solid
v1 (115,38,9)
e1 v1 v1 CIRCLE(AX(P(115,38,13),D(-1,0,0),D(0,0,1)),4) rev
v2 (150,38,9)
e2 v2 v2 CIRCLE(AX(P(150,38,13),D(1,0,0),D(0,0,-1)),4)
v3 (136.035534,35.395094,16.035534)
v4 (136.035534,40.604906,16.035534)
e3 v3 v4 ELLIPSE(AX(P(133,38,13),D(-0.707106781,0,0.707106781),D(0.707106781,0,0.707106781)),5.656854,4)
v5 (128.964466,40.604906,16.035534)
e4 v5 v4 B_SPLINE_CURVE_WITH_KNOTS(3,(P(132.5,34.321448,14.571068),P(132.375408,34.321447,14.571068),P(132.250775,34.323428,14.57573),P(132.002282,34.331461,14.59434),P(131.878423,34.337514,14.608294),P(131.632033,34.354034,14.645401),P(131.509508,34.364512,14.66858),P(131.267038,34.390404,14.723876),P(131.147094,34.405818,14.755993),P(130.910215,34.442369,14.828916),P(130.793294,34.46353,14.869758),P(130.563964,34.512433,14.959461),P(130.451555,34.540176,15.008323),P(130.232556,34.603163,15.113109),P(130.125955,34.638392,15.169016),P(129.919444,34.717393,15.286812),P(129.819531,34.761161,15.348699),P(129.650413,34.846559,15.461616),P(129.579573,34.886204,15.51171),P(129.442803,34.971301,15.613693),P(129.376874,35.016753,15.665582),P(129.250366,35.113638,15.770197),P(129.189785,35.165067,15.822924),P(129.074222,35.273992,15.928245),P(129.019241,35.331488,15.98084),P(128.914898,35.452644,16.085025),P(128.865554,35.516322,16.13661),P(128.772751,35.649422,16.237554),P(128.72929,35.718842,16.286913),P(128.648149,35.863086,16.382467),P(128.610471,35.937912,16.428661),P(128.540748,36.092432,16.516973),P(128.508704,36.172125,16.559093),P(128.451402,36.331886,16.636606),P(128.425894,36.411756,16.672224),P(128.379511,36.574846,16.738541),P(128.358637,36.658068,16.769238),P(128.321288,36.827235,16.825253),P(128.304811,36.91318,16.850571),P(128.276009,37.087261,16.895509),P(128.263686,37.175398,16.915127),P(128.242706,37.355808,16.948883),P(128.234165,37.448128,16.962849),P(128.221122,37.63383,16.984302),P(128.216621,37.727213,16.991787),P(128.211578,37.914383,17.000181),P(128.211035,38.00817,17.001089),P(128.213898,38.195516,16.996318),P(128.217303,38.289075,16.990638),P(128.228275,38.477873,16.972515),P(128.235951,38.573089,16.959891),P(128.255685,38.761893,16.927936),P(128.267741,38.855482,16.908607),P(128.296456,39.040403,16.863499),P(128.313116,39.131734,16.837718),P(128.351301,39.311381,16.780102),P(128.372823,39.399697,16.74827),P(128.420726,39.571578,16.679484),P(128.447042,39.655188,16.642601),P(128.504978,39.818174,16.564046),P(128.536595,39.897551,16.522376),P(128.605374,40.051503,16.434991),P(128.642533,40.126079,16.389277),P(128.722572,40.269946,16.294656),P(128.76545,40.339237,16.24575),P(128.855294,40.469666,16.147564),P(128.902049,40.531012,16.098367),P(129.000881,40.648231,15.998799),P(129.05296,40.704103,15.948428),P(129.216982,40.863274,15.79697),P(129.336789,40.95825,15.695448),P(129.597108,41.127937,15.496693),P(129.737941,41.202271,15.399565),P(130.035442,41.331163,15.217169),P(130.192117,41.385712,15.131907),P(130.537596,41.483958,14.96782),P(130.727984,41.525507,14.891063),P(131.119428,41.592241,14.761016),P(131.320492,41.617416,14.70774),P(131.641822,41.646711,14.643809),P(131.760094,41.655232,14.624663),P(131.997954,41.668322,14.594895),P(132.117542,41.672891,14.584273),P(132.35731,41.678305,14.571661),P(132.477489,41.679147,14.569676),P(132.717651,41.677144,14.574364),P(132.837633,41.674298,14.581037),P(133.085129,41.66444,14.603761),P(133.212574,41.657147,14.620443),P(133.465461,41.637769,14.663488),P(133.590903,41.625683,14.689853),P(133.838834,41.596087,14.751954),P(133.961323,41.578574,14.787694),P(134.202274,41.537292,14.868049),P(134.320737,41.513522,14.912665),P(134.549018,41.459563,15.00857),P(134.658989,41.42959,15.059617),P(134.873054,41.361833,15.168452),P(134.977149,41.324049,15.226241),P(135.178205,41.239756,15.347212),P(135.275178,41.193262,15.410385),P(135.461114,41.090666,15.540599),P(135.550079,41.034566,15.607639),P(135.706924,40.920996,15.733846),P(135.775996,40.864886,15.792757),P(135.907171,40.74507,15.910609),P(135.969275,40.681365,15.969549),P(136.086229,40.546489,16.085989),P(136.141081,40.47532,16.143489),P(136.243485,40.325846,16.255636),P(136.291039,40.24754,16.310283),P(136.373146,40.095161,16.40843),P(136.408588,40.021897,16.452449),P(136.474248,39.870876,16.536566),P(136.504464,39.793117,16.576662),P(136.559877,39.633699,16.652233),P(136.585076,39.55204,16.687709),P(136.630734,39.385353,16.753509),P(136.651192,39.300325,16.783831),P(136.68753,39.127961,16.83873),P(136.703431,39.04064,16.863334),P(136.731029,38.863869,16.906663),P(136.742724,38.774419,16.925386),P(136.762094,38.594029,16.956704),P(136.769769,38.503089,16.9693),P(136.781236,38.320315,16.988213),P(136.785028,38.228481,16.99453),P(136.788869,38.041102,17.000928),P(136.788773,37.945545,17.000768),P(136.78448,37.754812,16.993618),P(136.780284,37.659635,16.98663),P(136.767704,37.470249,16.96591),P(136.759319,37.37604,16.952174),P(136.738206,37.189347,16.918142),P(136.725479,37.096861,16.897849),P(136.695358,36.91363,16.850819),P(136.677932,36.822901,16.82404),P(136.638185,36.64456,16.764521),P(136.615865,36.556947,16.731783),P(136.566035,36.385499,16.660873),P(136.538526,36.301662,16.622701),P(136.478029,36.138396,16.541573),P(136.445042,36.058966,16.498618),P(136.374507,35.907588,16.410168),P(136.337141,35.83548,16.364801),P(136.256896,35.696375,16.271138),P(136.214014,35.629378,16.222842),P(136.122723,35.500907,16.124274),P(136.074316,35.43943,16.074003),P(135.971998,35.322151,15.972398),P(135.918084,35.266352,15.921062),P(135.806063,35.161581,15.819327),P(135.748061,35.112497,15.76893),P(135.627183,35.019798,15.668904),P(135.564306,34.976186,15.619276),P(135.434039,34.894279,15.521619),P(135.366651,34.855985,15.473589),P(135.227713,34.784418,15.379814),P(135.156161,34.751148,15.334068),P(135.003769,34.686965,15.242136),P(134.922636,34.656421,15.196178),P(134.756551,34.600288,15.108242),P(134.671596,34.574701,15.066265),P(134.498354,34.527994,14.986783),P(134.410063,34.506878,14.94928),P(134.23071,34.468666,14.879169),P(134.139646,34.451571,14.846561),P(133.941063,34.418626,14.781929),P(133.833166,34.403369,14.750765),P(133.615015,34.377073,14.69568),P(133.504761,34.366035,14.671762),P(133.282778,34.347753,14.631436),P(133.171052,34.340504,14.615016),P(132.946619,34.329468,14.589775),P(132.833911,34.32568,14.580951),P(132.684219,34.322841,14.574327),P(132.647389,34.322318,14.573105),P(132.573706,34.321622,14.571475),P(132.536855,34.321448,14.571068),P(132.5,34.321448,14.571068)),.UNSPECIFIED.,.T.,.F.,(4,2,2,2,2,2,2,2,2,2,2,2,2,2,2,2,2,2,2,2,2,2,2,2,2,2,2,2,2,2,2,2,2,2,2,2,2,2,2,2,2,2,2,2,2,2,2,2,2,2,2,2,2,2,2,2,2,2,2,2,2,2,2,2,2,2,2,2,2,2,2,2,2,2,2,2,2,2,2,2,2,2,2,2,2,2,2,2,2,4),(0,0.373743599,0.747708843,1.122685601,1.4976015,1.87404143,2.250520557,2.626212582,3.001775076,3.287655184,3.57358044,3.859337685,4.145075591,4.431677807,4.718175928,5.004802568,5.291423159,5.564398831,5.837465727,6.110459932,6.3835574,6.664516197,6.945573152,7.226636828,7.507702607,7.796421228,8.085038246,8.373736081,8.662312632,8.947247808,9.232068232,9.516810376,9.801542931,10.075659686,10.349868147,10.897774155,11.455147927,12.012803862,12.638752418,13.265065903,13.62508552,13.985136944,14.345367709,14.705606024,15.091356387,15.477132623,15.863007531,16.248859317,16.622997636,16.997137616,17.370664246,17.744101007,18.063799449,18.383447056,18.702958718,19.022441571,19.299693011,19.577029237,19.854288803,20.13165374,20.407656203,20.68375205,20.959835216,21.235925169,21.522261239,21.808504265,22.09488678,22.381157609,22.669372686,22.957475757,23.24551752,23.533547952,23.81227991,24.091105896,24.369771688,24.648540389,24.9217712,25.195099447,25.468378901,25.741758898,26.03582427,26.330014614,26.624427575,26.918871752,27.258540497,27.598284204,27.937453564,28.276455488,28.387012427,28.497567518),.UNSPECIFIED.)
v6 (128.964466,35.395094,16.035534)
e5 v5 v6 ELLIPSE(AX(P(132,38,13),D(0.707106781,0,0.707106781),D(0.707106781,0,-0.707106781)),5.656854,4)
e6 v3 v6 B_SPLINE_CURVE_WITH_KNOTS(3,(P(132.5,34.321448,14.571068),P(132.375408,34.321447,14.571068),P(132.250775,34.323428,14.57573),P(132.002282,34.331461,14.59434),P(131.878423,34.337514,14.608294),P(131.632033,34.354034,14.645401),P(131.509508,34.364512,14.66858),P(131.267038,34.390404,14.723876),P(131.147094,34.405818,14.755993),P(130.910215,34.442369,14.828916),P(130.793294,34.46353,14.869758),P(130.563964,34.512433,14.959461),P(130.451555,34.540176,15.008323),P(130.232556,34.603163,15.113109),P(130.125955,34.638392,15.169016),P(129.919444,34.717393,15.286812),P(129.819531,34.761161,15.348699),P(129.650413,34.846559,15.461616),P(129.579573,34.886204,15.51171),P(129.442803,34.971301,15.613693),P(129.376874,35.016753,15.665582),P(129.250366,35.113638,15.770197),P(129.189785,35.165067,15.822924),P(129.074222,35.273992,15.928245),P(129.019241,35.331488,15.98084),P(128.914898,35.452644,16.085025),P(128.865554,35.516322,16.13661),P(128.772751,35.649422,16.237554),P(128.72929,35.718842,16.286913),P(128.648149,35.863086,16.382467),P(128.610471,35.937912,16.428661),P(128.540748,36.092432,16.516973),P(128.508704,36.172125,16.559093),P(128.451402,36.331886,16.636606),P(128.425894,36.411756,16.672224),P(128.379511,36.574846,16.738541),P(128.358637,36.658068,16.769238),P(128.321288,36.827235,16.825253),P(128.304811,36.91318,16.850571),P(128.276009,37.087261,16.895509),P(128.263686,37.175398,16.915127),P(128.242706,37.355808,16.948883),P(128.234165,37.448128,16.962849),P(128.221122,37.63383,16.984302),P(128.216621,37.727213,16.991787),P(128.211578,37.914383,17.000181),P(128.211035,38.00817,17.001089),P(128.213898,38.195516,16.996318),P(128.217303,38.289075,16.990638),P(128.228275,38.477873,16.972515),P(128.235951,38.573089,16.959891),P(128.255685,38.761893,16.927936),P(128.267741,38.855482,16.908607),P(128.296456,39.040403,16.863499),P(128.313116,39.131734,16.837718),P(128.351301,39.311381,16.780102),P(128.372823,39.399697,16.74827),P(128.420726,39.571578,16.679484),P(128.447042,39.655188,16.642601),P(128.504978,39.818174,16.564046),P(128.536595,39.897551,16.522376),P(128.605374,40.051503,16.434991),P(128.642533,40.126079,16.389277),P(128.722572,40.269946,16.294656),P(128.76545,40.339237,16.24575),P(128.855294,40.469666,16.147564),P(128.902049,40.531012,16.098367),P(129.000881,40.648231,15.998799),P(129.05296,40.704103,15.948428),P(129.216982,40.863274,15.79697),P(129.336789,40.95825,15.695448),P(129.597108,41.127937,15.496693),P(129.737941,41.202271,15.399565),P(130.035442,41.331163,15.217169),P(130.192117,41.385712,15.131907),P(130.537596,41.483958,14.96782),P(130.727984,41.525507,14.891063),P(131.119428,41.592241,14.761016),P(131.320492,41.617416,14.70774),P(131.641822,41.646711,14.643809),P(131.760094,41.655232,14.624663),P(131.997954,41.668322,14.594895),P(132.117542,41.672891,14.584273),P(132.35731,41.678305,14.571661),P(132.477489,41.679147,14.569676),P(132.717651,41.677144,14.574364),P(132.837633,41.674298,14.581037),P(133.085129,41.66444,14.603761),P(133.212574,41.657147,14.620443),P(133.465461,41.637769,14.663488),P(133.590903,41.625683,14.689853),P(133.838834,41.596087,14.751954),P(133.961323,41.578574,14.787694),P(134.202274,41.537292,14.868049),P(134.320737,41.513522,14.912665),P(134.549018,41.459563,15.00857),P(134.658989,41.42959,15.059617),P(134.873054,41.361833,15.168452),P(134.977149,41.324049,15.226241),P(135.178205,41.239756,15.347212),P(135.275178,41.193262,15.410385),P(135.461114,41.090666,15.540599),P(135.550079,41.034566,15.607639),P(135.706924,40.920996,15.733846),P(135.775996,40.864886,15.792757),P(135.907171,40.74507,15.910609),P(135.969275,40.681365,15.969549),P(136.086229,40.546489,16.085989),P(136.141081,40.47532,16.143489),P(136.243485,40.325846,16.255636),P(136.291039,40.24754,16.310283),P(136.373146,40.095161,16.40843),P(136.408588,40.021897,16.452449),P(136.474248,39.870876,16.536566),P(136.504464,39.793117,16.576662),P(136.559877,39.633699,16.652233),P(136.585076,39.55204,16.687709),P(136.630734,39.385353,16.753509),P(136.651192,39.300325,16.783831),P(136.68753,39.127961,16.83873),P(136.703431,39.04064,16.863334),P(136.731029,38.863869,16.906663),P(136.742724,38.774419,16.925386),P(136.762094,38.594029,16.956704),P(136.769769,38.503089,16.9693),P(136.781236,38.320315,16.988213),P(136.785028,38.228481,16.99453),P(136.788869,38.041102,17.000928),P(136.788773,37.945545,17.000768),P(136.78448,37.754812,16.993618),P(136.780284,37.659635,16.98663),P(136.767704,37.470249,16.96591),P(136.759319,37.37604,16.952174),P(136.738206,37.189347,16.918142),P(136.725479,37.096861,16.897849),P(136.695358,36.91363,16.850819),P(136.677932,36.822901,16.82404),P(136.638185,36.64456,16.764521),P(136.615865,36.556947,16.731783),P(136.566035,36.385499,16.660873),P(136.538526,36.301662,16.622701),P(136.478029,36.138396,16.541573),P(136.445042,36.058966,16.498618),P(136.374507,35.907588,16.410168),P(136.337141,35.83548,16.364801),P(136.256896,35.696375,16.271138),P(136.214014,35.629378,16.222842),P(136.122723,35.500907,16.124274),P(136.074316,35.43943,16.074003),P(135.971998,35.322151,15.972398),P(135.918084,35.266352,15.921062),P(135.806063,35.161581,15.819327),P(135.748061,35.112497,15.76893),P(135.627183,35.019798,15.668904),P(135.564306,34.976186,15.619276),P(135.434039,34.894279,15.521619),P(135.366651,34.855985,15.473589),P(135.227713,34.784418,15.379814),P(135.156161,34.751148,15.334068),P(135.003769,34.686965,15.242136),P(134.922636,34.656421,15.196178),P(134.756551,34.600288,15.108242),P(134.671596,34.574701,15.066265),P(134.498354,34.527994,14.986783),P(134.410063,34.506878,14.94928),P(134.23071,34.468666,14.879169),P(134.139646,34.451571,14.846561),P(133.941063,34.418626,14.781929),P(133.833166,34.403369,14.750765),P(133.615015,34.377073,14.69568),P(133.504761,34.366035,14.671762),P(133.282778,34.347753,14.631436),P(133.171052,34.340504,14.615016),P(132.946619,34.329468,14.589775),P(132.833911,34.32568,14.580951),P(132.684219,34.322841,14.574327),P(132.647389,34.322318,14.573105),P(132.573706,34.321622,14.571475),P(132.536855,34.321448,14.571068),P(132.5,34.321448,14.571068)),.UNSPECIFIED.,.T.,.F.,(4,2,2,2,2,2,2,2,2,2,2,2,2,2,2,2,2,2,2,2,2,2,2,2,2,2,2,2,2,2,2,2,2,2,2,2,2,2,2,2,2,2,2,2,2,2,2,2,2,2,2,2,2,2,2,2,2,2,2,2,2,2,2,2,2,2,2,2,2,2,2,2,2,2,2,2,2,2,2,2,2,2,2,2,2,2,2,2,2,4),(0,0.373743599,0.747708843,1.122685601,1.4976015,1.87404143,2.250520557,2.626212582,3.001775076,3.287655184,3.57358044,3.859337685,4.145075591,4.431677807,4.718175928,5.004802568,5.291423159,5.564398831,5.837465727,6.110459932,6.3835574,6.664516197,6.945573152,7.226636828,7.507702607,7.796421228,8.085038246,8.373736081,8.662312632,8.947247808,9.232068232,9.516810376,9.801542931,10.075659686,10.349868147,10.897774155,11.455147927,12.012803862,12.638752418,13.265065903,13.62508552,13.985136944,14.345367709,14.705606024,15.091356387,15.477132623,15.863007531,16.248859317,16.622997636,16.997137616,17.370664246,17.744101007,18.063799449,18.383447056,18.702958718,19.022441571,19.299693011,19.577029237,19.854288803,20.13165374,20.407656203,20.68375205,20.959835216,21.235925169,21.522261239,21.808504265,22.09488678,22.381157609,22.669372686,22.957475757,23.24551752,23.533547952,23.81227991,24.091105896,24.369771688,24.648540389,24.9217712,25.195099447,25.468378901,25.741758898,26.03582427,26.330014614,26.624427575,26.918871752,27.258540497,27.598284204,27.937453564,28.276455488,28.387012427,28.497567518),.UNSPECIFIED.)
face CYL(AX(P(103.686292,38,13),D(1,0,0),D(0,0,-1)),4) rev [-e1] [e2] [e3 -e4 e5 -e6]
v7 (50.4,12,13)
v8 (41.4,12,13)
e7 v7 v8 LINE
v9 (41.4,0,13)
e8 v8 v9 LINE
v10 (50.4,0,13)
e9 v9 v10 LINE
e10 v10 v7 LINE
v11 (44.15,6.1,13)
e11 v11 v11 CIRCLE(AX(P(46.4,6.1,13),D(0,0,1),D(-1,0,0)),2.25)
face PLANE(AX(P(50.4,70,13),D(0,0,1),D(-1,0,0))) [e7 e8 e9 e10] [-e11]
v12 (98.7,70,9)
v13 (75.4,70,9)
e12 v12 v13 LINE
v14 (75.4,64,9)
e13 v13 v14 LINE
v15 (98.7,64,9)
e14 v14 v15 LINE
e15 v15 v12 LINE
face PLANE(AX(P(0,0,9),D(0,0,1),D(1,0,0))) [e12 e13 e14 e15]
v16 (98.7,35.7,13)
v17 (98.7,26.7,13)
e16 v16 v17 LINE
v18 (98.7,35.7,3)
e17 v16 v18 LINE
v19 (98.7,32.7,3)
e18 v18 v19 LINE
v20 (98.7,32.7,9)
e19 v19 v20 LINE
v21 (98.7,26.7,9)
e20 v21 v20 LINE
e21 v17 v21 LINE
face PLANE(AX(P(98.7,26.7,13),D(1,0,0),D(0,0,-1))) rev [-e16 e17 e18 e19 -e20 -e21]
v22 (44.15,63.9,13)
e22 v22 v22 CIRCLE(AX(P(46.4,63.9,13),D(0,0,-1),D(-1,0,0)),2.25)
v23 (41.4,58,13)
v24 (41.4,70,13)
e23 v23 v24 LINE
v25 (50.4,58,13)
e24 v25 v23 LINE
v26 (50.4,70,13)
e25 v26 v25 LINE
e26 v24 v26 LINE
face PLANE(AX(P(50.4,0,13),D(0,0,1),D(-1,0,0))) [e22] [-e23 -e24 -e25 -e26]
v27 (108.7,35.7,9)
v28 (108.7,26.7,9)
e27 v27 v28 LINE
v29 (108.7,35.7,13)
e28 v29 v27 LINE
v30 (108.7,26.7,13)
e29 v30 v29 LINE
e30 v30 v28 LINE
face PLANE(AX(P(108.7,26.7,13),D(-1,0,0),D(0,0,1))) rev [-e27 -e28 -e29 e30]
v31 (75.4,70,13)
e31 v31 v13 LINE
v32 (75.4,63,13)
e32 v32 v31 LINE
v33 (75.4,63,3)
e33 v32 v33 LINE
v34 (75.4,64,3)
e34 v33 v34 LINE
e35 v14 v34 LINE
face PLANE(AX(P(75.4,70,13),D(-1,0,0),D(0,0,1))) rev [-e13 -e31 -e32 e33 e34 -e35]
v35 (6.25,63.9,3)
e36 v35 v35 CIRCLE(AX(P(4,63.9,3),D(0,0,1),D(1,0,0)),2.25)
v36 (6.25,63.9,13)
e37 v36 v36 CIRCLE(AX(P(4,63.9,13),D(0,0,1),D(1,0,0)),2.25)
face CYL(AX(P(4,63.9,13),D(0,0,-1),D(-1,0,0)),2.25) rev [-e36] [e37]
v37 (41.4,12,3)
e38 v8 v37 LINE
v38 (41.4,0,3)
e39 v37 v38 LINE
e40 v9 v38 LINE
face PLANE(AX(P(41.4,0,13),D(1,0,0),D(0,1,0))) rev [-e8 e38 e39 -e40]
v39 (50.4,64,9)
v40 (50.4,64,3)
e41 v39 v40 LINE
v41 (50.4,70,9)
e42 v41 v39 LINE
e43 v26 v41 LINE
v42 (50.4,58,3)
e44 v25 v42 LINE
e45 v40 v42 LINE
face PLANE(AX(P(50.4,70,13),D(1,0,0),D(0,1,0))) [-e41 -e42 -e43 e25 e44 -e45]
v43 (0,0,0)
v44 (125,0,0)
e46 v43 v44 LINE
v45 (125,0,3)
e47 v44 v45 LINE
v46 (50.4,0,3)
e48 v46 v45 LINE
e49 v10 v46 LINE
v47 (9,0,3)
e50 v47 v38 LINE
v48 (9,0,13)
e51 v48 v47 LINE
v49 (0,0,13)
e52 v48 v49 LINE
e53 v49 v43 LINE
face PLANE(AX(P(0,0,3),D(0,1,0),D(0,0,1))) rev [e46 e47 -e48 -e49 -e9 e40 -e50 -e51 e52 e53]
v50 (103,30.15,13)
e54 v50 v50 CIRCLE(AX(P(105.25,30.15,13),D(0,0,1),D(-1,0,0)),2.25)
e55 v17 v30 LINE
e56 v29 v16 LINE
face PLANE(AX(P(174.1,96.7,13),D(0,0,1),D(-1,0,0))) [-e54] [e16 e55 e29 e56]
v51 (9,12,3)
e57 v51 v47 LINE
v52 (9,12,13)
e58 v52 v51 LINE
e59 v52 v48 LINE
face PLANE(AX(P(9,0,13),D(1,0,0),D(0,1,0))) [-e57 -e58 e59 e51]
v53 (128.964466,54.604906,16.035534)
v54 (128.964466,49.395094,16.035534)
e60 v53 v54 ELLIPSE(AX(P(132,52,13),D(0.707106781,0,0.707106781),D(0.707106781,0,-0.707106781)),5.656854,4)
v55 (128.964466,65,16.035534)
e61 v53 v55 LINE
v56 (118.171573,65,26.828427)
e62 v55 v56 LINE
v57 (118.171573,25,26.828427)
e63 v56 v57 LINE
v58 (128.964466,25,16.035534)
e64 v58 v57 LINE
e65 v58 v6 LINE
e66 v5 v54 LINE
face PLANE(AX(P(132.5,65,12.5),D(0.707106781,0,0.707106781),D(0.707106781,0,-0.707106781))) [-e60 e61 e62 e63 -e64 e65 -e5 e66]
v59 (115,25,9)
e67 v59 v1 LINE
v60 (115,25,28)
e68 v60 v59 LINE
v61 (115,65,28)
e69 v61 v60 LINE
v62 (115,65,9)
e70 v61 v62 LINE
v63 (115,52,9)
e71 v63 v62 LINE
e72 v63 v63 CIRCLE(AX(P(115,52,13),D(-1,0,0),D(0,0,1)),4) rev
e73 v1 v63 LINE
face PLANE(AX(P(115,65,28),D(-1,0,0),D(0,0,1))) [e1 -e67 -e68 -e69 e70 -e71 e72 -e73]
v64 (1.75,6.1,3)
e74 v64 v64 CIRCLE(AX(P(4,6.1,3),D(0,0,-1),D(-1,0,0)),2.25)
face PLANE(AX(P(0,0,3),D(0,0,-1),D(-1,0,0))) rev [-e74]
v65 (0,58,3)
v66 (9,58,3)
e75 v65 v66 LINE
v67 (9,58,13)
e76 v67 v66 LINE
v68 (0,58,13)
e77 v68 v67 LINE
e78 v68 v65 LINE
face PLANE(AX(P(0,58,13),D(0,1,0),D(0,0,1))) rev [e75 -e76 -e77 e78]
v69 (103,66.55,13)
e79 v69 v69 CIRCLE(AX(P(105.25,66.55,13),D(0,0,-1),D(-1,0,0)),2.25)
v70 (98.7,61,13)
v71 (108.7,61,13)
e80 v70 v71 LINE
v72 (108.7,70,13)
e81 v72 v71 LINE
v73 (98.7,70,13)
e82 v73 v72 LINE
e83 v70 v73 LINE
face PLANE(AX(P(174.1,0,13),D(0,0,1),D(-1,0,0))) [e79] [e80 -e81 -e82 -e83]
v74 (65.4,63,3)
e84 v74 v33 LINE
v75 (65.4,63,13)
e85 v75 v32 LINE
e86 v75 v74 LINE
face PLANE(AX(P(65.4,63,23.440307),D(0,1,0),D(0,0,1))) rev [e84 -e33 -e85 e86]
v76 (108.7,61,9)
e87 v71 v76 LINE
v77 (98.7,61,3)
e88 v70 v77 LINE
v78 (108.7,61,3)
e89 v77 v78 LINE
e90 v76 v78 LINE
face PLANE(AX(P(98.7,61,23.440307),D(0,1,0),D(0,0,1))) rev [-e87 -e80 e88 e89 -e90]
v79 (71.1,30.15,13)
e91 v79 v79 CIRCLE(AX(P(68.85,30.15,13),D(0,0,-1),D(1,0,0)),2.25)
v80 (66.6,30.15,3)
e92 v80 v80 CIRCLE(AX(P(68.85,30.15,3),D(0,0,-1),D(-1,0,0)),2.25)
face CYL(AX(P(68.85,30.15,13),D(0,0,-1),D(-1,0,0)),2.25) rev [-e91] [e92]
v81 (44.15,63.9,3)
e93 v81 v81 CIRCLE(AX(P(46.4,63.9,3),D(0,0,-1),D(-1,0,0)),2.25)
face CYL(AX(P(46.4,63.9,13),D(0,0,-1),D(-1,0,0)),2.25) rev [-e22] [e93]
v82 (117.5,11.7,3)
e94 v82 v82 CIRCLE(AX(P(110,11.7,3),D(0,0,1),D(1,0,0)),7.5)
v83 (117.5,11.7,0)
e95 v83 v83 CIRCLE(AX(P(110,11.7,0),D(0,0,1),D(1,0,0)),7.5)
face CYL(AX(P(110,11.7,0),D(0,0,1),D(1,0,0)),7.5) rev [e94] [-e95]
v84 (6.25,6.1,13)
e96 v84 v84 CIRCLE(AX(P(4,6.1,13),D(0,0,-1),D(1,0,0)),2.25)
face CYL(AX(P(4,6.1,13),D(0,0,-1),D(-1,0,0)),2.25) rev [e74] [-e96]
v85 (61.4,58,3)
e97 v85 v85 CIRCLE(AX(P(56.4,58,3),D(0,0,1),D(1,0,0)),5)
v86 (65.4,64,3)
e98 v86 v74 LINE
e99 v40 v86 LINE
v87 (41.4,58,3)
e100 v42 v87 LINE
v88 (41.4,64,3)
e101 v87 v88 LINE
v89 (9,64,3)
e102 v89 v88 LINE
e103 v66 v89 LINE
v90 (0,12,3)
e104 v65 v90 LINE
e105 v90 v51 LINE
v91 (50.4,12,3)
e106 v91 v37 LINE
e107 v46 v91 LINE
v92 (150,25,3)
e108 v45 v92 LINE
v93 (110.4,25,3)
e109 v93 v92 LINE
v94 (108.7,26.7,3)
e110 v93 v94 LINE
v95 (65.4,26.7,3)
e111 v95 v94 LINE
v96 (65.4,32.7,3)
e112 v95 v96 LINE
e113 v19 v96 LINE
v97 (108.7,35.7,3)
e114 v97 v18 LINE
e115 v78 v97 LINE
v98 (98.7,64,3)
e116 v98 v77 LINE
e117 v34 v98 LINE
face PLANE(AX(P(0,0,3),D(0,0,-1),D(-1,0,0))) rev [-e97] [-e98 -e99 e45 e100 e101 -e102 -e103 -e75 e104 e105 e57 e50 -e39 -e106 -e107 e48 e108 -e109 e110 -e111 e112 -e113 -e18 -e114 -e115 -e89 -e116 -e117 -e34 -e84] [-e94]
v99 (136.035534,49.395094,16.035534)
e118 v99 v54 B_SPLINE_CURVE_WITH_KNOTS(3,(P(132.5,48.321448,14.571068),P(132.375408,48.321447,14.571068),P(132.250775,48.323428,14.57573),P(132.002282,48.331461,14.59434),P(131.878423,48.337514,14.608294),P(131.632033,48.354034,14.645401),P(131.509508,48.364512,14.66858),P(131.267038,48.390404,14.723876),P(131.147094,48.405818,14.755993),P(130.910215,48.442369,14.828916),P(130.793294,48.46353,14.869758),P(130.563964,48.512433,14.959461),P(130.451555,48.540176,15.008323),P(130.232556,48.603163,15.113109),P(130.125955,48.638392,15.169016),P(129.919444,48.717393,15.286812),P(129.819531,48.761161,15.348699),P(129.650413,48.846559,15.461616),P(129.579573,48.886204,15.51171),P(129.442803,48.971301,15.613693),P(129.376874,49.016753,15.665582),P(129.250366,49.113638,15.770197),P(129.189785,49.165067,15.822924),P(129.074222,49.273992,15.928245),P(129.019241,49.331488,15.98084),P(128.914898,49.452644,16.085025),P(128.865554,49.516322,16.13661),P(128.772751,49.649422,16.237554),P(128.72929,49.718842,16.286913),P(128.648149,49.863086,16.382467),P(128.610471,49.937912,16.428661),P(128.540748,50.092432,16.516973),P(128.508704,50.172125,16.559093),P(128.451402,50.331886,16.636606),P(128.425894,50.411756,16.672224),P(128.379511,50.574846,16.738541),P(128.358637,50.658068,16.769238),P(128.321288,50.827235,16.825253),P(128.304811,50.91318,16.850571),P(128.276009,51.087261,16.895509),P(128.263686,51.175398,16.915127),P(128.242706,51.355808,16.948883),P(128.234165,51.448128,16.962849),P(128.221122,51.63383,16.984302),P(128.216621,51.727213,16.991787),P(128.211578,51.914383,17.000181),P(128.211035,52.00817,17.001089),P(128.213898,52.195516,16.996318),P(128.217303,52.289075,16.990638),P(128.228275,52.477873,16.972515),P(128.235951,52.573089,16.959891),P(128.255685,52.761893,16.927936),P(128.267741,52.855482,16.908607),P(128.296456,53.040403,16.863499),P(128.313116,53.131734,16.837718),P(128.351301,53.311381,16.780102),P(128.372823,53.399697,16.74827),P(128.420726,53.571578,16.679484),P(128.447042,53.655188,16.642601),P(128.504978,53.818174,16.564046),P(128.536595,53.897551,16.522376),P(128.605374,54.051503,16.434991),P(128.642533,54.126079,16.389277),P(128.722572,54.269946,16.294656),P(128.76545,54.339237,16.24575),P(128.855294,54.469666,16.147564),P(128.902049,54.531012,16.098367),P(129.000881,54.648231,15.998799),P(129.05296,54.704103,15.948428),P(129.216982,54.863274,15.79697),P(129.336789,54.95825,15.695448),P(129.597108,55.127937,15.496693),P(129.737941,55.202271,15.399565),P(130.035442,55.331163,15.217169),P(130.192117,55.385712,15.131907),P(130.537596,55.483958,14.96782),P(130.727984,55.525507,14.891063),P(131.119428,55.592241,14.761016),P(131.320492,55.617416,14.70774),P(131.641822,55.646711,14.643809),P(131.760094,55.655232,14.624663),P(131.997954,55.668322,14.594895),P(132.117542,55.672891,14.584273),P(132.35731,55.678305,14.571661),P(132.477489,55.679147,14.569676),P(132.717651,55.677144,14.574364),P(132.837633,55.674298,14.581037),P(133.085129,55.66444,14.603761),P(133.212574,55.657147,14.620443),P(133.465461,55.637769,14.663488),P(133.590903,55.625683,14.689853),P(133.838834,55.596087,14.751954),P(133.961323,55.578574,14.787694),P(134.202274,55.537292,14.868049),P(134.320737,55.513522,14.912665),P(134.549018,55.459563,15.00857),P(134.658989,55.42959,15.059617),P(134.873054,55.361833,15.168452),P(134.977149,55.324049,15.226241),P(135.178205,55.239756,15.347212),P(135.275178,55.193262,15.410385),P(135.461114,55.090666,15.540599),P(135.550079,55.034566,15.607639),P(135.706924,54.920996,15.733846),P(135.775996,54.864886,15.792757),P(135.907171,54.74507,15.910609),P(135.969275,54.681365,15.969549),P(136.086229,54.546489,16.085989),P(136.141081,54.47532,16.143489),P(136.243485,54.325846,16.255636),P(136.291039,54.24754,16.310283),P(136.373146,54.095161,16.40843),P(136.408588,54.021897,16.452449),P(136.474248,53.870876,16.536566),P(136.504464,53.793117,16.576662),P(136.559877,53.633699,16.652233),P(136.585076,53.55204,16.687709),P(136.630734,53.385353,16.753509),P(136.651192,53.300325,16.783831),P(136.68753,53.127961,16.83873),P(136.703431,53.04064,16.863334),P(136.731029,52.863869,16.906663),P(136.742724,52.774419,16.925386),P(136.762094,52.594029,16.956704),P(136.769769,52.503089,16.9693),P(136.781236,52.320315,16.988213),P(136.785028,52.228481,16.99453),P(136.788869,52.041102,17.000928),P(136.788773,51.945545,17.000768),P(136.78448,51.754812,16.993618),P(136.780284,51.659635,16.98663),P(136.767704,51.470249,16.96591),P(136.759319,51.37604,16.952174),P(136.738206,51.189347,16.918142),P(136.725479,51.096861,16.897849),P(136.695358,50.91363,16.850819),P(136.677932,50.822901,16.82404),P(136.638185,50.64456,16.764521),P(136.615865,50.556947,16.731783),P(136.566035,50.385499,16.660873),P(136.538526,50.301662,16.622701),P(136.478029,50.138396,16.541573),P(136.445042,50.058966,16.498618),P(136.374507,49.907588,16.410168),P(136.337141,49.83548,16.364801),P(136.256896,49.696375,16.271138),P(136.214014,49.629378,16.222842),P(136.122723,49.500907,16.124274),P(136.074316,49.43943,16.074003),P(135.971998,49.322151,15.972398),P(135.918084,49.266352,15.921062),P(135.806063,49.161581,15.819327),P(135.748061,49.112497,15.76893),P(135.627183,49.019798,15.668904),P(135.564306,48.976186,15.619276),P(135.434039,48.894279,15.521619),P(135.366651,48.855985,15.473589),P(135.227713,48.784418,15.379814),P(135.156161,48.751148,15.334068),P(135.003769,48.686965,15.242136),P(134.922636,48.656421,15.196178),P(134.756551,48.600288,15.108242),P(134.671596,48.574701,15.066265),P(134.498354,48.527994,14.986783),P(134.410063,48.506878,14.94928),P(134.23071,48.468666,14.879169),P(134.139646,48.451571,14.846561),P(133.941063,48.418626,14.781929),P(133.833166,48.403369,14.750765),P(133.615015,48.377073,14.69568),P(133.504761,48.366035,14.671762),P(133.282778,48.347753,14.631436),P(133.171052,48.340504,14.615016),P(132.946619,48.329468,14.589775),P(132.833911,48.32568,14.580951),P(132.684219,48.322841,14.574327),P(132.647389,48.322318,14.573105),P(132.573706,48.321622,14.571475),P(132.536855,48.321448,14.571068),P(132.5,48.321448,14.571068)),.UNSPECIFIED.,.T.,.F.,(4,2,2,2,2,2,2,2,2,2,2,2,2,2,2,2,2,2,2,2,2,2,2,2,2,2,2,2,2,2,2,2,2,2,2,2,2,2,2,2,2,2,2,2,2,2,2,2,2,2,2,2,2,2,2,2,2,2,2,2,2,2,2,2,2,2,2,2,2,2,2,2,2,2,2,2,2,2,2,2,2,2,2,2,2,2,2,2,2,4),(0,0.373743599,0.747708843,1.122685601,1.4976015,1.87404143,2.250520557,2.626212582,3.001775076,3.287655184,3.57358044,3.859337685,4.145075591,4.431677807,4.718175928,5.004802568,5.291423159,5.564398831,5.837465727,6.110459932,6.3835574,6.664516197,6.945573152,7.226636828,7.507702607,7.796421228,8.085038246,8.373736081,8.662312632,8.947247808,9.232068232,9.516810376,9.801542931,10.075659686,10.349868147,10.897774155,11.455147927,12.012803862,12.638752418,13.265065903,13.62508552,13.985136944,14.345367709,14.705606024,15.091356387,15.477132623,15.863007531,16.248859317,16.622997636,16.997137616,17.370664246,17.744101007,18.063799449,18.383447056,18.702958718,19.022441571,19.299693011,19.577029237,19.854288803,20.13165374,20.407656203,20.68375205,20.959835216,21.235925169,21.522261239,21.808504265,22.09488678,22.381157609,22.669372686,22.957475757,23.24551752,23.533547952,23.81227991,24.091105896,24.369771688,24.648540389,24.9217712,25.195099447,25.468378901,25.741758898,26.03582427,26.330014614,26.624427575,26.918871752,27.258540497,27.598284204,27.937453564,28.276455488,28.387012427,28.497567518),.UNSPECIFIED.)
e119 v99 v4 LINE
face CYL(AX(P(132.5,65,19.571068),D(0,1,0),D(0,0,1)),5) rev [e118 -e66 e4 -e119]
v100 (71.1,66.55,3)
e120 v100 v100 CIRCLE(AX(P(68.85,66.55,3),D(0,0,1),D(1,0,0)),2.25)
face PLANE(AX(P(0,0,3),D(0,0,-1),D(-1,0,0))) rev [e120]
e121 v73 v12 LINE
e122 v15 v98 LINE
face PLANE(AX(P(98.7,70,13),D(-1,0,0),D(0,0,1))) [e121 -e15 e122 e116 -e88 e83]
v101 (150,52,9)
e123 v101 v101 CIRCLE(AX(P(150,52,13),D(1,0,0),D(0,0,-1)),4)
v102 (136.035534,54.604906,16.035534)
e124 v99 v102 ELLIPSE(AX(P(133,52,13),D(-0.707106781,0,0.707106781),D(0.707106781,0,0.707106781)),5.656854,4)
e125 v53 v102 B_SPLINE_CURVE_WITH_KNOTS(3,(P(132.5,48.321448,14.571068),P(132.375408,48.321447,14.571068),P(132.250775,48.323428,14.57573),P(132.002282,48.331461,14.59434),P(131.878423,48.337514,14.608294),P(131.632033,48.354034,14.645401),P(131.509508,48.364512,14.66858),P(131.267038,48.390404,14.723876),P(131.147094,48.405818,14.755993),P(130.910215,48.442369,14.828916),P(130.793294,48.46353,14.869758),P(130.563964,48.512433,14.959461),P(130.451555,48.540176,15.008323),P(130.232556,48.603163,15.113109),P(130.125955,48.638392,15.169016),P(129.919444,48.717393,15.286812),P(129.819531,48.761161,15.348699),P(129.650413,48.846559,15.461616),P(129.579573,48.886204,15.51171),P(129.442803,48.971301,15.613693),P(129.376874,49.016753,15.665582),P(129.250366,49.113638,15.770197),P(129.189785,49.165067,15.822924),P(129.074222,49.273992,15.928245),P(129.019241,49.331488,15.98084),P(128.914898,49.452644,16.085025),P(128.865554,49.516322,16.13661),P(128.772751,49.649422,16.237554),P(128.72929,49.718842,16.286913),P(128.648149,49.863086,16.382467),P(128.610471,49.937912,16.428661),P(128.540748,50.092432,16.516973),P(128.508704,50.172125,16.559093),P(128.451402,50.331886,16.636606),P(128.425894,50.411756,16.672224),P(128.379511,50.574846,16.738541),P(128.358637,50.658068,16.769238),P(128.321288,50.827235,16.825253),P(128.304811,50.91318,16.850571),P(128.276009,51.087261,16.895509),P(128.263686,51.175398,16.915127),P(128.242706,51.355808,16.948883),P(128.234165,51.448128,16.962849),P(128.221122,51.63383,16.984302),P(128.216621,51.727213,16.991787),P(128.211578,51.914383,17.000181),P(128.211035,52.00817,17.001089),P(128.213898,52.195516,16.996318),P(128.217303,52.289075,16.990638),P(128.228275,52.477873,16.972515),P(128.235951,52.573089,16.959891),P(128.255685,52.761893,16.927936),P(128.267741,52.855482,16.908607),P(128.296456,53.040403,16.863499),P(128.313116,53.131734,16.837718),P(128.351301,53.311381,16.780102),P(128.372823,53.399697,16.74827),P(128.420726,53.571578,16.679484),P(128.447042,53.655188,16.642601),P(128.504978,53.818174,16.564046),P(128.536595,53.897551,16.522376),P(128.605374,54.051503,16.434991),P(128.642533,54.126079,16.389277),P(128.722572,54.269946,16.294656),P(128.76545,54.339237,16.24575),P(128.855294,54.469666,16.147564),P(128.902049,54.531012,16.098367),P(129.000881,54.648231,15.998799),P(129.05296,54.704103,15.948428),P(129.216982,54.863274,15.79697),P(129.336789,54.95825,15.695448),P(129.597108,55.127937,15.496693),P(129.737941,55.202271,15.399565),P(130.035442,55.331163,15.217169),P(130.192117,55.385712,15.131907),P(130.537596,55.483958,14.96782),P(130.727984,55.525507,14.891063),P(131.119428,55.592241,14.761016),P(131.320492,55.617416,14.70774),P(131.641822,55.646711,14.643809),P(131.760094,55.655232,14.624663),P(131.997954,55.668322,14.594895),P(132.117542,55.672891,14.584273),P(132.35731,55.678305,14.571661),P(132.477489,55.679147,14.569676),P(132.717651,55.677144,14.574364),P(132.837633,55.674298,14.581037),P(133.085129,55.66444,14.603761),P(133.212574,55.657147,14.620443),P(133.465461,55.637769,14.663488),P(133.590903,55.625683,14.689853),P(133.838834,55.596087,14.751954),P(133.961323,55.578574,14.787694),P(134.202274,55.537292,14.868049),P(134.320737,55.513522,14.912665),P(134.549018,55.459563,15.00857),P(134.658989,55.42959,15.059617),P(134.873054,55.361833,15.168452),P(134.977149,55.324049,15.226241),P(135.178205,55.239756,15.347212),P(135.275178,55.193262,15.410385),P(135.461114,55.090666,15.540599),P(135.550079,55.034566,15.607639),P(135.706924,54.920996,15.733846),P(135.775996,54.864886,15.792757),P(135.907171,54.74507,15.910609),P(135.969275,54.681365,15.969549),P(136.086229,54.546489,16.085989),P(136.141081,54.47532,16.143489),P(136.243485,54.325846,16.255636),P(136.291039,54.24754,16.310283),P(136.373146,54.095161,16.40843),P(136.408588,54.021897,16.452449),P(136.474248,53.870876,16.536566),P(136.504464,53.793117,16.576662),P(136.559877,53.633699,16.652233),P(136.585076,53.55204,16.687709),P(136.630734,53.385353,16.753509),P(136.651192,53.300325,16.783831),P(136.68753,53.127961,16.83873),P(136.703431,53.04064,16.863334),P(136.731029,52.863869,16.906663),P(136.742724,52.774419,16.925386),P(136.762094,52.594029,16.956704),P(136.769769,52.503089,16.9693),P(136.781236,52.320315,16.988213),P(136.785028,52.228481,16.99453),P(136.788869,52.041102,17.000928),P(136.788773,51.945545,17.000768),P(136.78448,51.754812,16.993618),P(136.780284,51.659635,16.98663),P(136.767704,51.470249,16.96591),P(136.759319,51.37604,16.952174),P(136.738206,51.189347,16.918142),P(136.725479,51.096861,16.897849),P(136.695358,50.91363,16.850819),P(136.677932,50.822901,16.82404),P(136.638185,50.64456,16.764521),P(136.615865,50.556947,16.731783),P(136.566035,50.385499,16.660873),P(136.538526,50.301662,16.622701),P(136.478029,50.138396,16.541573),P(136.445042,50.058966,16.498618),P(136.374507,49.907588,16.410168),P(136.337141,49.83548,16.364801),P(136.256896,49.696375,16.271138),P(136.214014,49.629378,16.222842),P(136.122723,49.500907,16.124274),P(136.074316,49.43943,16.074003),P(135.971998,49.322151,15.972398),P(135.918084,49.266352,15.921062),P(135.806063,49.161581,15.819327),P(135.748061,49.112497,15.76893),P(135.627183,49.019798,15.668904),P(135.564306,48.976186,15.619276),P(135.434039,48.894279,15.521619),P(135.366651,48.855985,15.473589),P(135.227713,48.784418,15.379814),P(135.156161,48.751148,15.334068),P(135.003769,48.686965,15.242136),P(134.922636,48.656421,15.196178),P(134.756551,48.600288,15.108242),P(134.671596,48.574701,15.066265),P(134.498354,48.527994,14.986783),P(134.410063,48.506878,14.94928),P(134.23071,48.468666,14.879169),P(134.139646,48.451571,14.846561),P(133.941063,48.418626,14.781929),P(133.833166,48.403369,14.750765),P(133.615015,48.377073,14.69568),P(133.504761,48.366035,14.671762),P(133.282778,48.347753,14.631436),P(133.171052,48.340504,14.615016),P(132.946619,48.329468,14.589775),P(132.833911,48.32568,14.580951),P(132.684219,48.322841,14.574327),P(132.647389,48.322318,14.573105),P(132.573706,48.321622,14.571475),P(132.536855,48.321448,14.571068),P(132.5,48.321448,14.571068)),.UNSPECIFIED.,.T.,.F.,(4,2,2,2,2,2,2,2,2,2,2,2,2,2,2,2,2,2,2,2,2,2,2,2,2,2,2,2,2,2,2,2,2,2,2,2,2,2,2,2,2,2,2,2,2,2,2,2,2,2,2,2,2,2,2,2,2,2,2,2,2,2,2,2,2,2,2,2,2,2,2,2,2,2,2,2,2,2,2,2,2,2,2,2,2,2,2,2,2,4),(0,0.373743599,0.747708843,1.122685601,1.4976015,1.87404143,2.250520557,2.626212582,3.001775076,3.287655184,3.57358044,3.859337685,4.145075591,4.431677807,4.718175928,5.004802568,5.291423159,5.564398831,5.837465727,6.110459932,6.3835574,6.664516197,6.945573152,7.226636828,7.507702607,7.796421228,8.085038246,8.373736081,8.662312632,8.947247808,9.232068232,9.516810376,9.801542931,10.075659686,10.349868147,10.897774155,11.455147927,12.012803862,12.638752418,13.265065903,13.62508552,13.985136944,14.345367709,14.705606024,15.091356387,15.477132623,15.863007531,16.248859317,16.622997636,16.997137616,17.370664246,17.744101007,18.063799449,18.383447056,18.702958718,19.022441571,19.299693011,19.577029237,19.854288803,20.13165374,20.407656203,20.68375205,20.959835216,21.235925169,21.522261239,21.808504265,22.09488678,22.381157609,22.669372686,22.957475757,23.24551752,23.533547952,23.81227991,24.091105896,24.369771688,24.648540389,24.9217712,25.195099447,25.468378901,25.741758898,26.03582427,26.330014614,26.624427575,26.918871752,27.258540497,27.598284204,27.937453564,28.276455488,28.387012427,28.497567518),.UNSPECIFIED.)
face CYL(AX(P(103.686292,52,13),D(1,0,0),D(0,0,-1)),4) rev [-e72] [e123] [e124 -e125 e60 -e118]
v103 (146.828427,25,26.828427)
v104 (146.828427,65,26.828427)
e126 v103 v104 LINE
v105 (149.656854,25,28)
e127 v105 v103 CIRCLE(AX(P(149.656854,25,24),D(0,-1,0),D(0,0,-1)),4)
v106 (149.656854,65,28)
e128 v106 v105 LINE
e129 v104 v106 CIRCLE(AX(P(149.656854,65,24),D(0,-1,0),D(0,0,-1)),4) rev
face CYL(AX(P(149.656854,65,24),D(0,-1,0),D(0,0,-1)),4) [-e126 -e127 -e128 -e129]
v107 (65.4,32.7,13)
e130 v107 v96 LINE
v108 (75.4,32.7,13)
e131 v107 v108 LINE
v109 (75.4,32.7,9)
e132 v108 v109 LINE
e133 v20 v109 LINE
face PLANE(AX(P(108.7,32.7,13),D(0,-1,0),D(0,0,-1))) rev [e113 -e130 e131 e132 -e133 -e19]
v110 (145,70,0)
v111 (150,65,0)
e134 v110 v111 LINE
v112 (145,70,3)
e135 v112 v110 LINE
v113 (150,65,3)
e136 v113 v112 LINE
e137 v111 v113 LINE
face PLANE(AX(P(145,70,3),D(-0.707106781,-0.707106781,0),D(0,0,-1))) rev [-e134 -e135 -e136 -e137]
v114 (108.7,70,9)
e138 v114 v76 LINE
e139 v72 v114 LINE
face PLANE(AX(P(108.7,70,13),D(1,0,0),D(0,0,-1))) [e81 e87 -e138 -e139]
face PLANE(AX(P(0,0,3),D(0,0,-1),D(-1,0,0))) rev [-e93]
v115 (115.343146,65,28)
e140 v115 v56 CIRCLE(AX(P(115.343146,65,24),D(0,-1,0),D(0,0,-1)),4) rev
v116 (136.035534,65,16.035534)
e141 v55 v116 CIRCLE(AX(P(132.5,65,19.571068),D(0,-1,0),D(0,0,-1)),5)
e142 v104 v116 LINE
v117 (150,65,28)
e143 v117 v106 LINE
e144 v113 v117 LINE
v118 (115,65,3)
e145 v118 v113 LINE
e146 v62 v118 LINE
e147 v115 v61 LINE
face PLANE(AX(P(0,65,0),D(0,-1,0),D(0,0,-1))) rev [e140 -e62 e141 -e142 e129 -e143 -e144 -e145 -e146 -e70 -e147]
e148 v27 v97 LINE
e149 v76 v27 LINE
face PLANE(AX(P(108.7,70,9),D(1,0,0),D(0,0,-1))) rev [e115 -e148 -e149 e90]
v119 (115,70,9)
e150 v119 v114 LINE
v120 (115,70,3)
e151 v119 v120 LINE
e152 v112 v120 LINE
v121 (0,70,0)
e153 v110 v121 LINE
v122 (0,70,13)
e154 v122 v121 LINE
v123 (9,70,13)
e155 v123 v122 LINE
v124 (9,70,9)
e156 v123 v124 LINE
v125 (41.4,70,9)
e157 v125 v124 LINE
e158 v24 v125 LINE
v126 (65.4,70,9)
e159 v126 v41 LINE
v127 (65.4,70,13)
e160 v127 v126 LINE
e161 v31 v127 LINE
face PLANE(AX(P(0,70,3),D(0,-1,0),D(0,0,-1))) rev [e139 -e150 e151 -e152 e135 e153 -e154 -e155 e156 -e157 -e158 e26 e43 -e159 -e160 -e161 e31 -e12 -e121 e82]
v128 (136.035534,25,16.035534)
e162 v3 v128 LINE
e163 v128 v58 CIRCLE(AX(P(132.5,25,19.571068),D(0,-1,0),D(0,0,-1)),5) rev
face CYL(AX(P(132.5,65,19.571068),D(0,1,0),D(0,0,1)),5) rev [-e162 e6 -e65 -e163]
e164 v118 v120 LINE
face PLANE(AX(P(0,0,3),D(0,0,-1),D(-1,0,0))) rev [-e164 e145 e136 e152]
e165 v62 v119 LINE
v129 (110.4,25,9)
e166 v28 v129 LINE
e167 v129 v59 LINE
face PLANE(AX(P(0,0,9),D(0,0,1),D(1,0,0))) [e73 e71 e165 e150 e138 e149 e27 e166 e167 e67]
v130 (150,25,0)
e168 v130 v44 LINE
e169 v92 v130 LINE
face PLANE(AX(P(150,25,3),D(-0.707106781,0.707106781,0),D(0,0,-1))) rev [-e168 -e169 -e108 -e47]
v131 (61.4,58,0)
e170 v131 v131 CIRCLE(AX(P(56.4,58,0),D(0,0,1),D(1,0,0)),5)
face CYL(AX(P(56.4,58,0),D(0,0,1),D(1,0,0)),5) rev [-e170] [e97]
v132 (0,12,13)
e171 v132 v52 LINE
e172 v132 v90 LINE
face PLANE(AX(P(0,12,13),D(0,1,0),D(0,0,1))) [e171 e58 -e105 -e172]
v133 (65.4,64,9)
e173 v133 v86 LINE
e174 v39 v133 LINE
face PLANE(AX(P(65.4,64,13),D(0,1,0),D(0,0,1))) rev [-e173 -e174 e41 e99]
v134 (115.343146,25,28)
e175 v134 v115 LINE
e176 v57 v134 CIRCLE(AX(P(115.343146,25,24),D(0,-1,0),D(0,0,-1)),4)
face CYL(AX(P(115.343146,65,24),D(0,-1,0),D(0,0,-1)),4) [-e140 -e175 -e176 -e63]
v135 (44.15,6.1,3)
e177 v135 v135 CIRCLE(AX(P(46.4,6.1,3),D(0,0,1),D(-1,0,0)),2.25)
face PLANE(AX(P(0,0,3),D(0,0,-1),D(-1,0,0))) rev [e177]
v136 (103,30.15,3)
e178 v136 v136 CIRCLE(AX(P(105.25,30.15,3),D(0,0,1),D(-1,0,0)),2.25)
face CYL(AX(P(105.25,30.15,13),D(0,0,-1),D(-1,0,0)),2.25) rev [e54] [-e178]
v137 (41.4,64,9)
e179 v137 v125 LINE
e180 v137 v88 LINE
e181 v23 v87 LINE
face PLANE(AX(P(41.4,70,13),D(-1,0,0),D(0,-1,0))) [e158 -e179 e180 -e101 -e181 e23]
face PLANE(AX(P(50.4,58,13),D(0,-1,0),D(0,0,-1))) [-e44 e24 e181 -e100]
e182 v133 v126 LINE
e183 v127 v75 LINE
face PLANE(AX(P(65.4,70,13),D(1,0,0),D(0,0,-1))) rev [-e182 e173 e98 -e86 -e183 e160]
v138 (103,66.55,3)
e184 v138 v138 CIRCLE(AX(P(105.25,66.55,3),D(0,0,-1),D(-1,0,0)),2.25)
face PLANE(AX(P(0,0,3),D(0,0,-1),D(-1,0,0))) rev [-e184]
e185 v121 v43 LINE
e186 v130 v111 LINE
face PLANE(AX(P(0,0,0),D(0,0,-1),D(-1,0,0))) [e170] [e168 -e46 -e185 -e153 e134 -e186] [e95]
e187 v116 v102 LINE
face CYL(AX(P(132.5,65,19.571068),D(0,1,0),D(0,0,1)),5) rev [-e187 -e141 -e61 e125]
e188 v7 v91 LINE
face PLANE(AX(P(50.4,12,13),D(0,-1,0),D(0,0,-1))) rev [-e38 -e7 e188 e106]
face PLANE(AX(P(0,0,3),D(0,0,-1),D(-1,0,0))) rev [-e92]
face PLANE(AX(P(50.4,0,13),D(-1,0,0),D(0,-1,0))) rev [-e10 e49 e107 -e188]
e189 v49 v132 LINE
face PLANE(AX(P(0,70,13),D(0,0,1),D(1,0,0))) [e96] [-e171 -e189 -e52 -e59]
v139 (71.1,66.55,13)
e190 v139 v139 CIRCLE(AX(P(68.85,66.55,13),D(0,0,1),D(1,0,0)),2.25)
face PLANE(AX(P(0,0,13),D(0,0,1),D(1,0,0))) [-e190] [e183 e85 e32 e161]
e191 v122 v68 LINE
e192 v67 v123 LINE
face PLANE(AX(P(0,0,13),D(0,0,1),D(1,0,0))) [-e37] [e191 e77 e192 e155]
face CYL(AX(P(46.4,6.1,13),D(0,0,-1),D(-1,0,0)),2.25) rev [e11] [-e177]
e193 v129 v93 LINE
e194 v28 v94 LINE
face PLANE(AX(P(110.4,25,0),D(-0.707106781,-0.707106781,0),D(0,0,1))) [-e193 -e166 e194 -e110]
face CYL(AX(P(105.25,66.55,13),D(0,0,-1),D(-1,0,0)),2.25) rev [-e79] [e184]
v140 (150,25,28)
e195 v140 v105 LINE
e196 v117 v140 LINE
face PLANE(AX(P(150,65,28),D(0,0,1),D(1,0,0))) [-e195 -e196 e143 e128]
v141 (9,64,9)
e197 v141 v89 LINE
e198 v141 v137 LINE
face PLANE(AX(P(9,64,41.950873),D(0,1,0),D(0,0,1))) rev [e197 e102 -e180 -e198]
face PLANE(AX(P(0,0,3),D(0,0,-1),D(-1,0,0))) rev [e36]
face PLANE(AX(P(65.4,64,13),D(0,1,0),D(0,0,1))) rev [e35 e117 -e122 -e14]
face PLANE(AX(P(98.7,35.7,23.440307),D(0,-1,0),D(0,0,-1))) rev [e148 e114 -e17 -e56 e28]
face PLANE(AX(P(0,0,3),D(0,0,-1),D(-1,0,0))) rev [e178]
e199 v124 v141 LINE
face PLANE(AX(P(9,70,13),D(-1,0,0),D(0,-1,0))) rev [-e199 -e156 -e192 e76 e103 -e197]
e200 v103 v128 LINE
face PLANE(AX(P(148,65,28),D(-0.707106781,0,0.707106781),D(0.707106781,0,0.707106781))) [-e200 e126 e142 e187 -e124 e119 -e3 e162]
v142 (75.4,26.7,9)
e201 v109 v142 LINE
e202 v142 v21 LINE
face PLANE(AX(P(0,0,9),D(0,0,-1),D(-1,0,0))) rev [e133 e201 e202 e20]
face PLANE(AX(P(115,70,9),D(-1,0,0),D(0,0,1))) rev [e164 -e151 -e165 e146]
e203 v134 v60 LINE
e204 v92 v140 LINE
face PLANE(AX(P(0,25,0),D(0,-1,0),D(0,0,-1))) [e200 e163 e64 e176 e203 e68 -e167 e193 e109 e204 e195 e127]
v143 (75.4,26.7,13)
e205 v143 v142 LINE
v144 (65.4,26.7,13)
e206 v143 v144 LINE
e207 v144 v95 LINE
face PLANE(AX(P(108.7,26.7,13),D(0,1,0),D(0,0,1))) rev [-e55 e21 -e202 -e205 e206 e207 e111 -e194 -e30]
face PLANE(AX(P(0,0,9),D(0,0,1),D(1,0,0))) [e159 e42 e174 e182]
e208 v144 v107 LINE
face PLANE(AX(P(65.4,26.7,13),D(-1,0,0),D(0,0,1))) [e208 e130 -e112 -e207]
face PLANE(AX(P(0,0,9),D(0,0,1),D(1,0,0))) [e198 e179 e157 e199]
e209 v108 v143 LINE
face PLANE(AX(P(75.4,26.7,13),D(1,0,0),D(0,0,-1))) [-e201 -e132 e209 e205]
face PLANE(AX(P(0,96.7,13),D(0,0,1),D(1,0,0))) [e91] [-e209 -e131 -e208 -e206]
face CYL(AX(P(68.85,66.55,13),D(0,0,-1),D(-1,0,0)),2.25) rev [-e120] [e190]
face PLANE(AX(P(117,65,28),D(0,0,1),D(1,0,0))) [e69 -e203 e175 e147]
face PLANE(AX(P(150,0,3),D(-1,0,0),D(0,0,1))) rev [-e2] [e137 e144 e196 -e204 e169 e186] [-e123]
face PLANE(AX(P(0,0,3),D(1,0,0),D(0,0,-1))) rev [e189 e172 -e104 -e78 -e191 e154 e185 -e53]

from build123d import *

# Parameters (mm, degrees)
ESQUISSE1_W               = 150
ESQUISSE1_H               = 70
BOSS_EXTRU_1_DEPTH        = 3
ESQUISSE2_W               = 9
ESQUISSE2_H               = 12
ESQUISSE2_R               = 2.25
BOSS_EXTRU_2_DEPTH        = 10
SYM_TRIE2_COPY_1_SKETCH_W = 9
SYM_TRIE2_COPY_1_SKETCH_H = 12
SYM_TRIE2_COPY_1_SKETCH_R = 2.25
SYM_TRIE2_COPY_1_DEPTH    = 10
ESQUISSE3_W               = 10
ESQUISSE3_H               = 6
ESQUISSE3_R               = 2.25
BOSS_EXTRU_3_DEPTH        = 10
SYM_TRIE4_COPY_1_SKETCH_W = 10
SYM_TRIE4_COPY_1_SKETCH_H = 6
SYM_TRIE4_COPY_1_SKETCH_R = 2.25
SYM_TRIE4_COPY_1_DEPTH    = 10
BOSS_EXTRU_4_DEPTH        = 10
BOSS_EXTRU_4_DEPTH_BACK   = 30
CONG_1_R                  = 5
CONG_2_R                  = 4
ENL_V_MAT_EXTRU_1_REACH   = 169.881
ESQUISSE5_R               = 4
ESQUISSE6_W               = 23.3
ESQUISSE6_H               = 6
ESQUISSE6_W_2             = 6.3
ESQUISSE6_H_2             = 45
BOSS_EXTRU_5_DEPTH        = 6
CHANFREIN1_SIZE           = 1.7
ESQUISSE7_W               = 15
ESQUISSE7_H               = 6
ESQUISSE7_W_2             = 32.4
BOSS_EXTRU_6_DEPTH        = 6
CHANFREIN2_SIZE           = 5
CHANFREIN3_SIZE           = 25
ESQUISSE8_R               = 5
ENL_V_MAT_EXTRU_2_DEPTH   = 168.406690517
ESQUISSE9_R               = 7.5
ENL_V_MAT_EXTRU_3_DEPTH   = 168.406690517
ESQUISSE10_W              = 10
ESQUISSE10_H              = 1
ESQUISSE10_H_2            = 3
BOSS_EXTRU_7_DEPTH        = 10


with BuildPart() as part:
    # Esquisse1 → Boss.-Extru.1 (new body)
    with BuildSketch(Plane.XY):
        with Locations((75, 35)):
            Rectangle(ESQUISSE1_W, ESQUISSE1_H)
    extrude(amount=BOSS_EXTRU_1_DEPTH)

    # Esquisse2 → Boss.-Extru.2 (add)
    with BuildSketch(Plane.XY.offset(3)):
        with Locations((4.5, 64)):
            Rectangle(ESQUISSE2_W, ESQUISSE2_H)
        with Locations((4, 63.9)):
            Circle(ESQUISSE2_R, mode=Mode.SUBTRACT)
    boss_extru_2 = extrude(amount=BOSS_EXTRU_2_DEPTH)

    # Symétrie1: Boss.-Extru.2 across plane
    add(boss_extru_2.mirror(Plane.ZY.offset(-25.2)))

    # Symétrie2: Boss.-Extru.2 across plane
    add(boss_extru_2.mirror(Plane(origin=(0, 35, 0), x_dir=(0, 0, 1), z_dir=(0, -1, 0))))

    # Symétrie2 copy 1 sketch → Symétrie2 copy 1 (add)
    with BuildSketch(Plane(origin=(50.4, 70, 3), x_dir=(-1, 0, 0), z_dir=(0, 0, 1))):
        with Locations((4.5, 64)):
            Rectangle(SYM_TRIE2_COPY_1_SKETCH_W, SYM_TRIE2_COPY_1_SKETCH_H)
        with Locations((4, 63.9)):
            Circle(SYM_TRIE2_COPY_1_SKETCH_R, mode=Mode.SUBTRACT)
    extrude(amount=SYM_TRIE2_COPY_1_DEPTH)

    # Esquisse3 → Boss.-Extru.3 (add)
    with BuildSketch(Plane.XY.offset(3)):
        with Locations((70.4, 67)):
            Rectangle(ESQUISSE3_W, ESQUISSE3_H)
        with Locations((68.85, 66.55)):
            Circle(ESQUISSE3_R, mode=Mode.SUBTRACT)
    boss_extru_3 = extrude(amount=BOSS_EXTRU_3_DEPTH)

    # Symétrie3: Boss.-Extru.3 across plane
    add(boss_extru_3.mirror(Plane.ZY.offset(-87.05)))

    # Symétrie4: Boss.-Extru.3 across plane
    add(boss_extru_3.mirror(Plane.ZX.offset(48.35)))

    # Symétrie4 copy 1 sketch → Symétrie4 copy 1 (add)
    with BuildSketch(Plane(origin=(174.1, 96.7, 3), x_dir=(-1, 0, 0), z_dir=(0, 0, 1))):
        with Locations((70.4, 67)):
            Rectangle(SYM_TRIE4_COPY_1_SKETCH_W, SYM_TRIE4_COPY_1_SKETCH_H)
        with Locations((68.85, 66.55)):
            Circle(SYM_TRIE4_COPY_1_SKETCH_R, mode=Mode.SUBTRACT)
    extrude(amount=SYM_TRIE4_COPY_1_DEPTH)

    # Esquisse4 → Boss.-Extru.4 (add, two sides: drawn at the far end of the back side and taken through both)
    with BuildSketch(Plane(origin=(0, 35, 0), x_dir=(-1, 0, 0), z_dir=(0, -1, 0)).offset(-BOSS_EXTRU_4_DEPTH_BACK)):
        Polygon((-150, -3), (-150, -28), (-148, -28), (-132.5, -12.5), (-117, -28), (-115, -28), (-115, -3), align=None)
    extrude(amount=BOSS_EXTRU_4_DEPTH + BOSS_EXTRU_4_DEPTH_BACK)

    # Congé1
    cong_1_edges = [part.edges().sort_by_distance(p)[0] for p in [
        (132.5, 45, 12.5),
    ]]
    fillet(cong_1_edges, radius=CONG_1_R)

    # Congé2
    cong_2_edges = [part.edges().sort_by_distance(p)[0] for p in [
        (117, 45, 28),
        (148, 45, 28),
    ]]
    fillet(cong_2_edges, radius=CONG_2_R)

    # Enlèv. mat.-Extru.1: up to this face of the body (flat: up to its plane)
    enl_v_mat_extru_1_end = Plane(part.part.faces().sort_by_distance((115, 45, 15.5))[0])
    # Esquisse5 → Enlèv. mat.-Extru.1 (cut, up to the picked face)
    with BuildSketch(Plane(origin=(150, 0, 0), x_dir=(0, 0, -1), z_dir=(1, 0, 0)), mode=Mode.PRIVATE) as enl_v_mat_extru_1_sk1:
        with Locations((-13, 52)):
            Circle(ESQUISSE5_R)
    enl_v_mat_extru_1_tool1 = split(extrude(enl_v_mat_extru_1_sk1.sketch, amount=-ENL_V_MAT_EXTRU_1_REACH, mode=Mode.PRIVATE), bisect_by=enl_v_mat_extru_1_end, keep=Keep.BOTH, mode=Mode.PRIVATE)
    # Esquisse5 → Enlèv. mat.-Extru.1 (cut, up to the picked face)
    with BuildSketch(Plane(origin=(150, 0, 0), x_dir=(0, 0, -1), z_dir=(1, 0, 0)), mode=Mode.PRIVATE) as enl_v_mat_extru_1_sk2:
        with Locations((-13, 38)):
            Circle(ESQUISSE5_R)
    enl_v_mat_extru_1_tool2 = split(extrude(enl_v_mat_extru_1_sk2.sketch, amount=-ENL_V_MAT_EXTRU_1_REACH, mode=Mode.PRIVATE), bisect_by=enl_v_mat_extru_1_end, keep=Keep.BOTH, mode=Mode.PRIVATE)
    add(enl_v_mat_extru_1_tool1.solids().sort_by(Axis((150, 52, 13), (-1, 0, 0)))[0], mode=Mode.SUBTRACT)
    add(enl_v_mat_extru_1_tool2.solids().sort_by(Axis((150, 38, 13), (-1, 0, 0)))[0], mode=Mode.SUBTRACT)

    # Esquisse6 → Boss.-Extru.5 (add)
    with BuildSketch(Plane.XY.offset(3)):
        with Locations((87.05, 67)):
            Rectangle(ESQUISSE6_W, ESQUISSE6_H)
        with Locations((87.05, 29.7)):
            Rectangle(ESQUISSE6_W, ESQUISSE6_H)
        with Locations((111.85, 47.5)):
            Rectangle(ESQUISSE6_W_2, ESQUISSE6_H_2)
    extrude(amount=BOSS_EXTRU_5_DEPTH)

    # Chanfrein1
    chanfrein1_edges = [part.edges().sort_by_distance(p)[0] for p in [
        (108.7, 25, 6),
    ]]
    chamfer(chanfrein1_edges, length=CHANFREIN1_SIZE - 0.0001)  # a hair under: the kernel refuses the full size

    # Esquisse7 → Boss.-Extru.6 (add)
    with BuildSketch(Plane.XY.offset(3)):
        with Locations((57.9, 67)):
            Rectangle(ESQUISSE7_W, ESQUISSE7_H)
        with Locations((25.2, 67)):
            Rectangle(ESQUISSE7_W_2, ESQUISSE7_H)
    extrude(amount=BOSS_EXTRU_6_DEPTH)

    # Chanfrein2
    chanfrein2_edges = [part.edges().sort_by_distance(p)[0] for p in [
        (150, 70, 1.5),
    ]]
    chamfer(chanfrein2_edges, length=CHANFREIN2_SIZE)

    # Chanfrein3
    chanfrein3_edges = [part.edges().sort_by_distance(p)[0] for p in [
        (150, 0, 1.5),
    ]]
    chamfer(chanfrein3_edges, length=CHANFREIN3_SIZE)

    # Esquisse8 → Enlèv. mat.-Extru.2 (cut, through all)
    with BuildSketch(Plane.XY.offset(3)):
        with Locations((56.4, 58)):
            Circle(ESQUISSE8_R)
    extrude(amount=-ENL_V_MAT_EXTRU_2_DEPTH, mode=Mode.SUBTRACT)

    # Esquisse9 → Enlèv. mat.-Extru.3 (cut, through all)
    with BuildSketch(Plane.XY.offset(3)):
        with Locations((110, 11.7)):
            Circle(ESQUISSE9_R)
    extrude(amount=-ENL_V_MAT_EXTRU_3_DEPTH, mode=Mode.SUBTRACT)

    # Esquisse10 → Boss.-Extru.7 (add)
    with BuildSketch(Plane.XY.offset(3)):
        with Locations((70.4, 63.5)):
            Rectangle(ESQUISSE10_W, ESQUISSE10_H)
        with Locations((103.7, 62.5)):
            Rectangle(ESQUISSE10_W, ESQUISSE10_H_2)
        with Locations((103.7, 34.2)):
            Rectangle(ESQUISSE10_W, ESQUISSE10_H_2)
    extrude(amount=BOSS_EXTRU_7_DEPTH)


solid = part.part
